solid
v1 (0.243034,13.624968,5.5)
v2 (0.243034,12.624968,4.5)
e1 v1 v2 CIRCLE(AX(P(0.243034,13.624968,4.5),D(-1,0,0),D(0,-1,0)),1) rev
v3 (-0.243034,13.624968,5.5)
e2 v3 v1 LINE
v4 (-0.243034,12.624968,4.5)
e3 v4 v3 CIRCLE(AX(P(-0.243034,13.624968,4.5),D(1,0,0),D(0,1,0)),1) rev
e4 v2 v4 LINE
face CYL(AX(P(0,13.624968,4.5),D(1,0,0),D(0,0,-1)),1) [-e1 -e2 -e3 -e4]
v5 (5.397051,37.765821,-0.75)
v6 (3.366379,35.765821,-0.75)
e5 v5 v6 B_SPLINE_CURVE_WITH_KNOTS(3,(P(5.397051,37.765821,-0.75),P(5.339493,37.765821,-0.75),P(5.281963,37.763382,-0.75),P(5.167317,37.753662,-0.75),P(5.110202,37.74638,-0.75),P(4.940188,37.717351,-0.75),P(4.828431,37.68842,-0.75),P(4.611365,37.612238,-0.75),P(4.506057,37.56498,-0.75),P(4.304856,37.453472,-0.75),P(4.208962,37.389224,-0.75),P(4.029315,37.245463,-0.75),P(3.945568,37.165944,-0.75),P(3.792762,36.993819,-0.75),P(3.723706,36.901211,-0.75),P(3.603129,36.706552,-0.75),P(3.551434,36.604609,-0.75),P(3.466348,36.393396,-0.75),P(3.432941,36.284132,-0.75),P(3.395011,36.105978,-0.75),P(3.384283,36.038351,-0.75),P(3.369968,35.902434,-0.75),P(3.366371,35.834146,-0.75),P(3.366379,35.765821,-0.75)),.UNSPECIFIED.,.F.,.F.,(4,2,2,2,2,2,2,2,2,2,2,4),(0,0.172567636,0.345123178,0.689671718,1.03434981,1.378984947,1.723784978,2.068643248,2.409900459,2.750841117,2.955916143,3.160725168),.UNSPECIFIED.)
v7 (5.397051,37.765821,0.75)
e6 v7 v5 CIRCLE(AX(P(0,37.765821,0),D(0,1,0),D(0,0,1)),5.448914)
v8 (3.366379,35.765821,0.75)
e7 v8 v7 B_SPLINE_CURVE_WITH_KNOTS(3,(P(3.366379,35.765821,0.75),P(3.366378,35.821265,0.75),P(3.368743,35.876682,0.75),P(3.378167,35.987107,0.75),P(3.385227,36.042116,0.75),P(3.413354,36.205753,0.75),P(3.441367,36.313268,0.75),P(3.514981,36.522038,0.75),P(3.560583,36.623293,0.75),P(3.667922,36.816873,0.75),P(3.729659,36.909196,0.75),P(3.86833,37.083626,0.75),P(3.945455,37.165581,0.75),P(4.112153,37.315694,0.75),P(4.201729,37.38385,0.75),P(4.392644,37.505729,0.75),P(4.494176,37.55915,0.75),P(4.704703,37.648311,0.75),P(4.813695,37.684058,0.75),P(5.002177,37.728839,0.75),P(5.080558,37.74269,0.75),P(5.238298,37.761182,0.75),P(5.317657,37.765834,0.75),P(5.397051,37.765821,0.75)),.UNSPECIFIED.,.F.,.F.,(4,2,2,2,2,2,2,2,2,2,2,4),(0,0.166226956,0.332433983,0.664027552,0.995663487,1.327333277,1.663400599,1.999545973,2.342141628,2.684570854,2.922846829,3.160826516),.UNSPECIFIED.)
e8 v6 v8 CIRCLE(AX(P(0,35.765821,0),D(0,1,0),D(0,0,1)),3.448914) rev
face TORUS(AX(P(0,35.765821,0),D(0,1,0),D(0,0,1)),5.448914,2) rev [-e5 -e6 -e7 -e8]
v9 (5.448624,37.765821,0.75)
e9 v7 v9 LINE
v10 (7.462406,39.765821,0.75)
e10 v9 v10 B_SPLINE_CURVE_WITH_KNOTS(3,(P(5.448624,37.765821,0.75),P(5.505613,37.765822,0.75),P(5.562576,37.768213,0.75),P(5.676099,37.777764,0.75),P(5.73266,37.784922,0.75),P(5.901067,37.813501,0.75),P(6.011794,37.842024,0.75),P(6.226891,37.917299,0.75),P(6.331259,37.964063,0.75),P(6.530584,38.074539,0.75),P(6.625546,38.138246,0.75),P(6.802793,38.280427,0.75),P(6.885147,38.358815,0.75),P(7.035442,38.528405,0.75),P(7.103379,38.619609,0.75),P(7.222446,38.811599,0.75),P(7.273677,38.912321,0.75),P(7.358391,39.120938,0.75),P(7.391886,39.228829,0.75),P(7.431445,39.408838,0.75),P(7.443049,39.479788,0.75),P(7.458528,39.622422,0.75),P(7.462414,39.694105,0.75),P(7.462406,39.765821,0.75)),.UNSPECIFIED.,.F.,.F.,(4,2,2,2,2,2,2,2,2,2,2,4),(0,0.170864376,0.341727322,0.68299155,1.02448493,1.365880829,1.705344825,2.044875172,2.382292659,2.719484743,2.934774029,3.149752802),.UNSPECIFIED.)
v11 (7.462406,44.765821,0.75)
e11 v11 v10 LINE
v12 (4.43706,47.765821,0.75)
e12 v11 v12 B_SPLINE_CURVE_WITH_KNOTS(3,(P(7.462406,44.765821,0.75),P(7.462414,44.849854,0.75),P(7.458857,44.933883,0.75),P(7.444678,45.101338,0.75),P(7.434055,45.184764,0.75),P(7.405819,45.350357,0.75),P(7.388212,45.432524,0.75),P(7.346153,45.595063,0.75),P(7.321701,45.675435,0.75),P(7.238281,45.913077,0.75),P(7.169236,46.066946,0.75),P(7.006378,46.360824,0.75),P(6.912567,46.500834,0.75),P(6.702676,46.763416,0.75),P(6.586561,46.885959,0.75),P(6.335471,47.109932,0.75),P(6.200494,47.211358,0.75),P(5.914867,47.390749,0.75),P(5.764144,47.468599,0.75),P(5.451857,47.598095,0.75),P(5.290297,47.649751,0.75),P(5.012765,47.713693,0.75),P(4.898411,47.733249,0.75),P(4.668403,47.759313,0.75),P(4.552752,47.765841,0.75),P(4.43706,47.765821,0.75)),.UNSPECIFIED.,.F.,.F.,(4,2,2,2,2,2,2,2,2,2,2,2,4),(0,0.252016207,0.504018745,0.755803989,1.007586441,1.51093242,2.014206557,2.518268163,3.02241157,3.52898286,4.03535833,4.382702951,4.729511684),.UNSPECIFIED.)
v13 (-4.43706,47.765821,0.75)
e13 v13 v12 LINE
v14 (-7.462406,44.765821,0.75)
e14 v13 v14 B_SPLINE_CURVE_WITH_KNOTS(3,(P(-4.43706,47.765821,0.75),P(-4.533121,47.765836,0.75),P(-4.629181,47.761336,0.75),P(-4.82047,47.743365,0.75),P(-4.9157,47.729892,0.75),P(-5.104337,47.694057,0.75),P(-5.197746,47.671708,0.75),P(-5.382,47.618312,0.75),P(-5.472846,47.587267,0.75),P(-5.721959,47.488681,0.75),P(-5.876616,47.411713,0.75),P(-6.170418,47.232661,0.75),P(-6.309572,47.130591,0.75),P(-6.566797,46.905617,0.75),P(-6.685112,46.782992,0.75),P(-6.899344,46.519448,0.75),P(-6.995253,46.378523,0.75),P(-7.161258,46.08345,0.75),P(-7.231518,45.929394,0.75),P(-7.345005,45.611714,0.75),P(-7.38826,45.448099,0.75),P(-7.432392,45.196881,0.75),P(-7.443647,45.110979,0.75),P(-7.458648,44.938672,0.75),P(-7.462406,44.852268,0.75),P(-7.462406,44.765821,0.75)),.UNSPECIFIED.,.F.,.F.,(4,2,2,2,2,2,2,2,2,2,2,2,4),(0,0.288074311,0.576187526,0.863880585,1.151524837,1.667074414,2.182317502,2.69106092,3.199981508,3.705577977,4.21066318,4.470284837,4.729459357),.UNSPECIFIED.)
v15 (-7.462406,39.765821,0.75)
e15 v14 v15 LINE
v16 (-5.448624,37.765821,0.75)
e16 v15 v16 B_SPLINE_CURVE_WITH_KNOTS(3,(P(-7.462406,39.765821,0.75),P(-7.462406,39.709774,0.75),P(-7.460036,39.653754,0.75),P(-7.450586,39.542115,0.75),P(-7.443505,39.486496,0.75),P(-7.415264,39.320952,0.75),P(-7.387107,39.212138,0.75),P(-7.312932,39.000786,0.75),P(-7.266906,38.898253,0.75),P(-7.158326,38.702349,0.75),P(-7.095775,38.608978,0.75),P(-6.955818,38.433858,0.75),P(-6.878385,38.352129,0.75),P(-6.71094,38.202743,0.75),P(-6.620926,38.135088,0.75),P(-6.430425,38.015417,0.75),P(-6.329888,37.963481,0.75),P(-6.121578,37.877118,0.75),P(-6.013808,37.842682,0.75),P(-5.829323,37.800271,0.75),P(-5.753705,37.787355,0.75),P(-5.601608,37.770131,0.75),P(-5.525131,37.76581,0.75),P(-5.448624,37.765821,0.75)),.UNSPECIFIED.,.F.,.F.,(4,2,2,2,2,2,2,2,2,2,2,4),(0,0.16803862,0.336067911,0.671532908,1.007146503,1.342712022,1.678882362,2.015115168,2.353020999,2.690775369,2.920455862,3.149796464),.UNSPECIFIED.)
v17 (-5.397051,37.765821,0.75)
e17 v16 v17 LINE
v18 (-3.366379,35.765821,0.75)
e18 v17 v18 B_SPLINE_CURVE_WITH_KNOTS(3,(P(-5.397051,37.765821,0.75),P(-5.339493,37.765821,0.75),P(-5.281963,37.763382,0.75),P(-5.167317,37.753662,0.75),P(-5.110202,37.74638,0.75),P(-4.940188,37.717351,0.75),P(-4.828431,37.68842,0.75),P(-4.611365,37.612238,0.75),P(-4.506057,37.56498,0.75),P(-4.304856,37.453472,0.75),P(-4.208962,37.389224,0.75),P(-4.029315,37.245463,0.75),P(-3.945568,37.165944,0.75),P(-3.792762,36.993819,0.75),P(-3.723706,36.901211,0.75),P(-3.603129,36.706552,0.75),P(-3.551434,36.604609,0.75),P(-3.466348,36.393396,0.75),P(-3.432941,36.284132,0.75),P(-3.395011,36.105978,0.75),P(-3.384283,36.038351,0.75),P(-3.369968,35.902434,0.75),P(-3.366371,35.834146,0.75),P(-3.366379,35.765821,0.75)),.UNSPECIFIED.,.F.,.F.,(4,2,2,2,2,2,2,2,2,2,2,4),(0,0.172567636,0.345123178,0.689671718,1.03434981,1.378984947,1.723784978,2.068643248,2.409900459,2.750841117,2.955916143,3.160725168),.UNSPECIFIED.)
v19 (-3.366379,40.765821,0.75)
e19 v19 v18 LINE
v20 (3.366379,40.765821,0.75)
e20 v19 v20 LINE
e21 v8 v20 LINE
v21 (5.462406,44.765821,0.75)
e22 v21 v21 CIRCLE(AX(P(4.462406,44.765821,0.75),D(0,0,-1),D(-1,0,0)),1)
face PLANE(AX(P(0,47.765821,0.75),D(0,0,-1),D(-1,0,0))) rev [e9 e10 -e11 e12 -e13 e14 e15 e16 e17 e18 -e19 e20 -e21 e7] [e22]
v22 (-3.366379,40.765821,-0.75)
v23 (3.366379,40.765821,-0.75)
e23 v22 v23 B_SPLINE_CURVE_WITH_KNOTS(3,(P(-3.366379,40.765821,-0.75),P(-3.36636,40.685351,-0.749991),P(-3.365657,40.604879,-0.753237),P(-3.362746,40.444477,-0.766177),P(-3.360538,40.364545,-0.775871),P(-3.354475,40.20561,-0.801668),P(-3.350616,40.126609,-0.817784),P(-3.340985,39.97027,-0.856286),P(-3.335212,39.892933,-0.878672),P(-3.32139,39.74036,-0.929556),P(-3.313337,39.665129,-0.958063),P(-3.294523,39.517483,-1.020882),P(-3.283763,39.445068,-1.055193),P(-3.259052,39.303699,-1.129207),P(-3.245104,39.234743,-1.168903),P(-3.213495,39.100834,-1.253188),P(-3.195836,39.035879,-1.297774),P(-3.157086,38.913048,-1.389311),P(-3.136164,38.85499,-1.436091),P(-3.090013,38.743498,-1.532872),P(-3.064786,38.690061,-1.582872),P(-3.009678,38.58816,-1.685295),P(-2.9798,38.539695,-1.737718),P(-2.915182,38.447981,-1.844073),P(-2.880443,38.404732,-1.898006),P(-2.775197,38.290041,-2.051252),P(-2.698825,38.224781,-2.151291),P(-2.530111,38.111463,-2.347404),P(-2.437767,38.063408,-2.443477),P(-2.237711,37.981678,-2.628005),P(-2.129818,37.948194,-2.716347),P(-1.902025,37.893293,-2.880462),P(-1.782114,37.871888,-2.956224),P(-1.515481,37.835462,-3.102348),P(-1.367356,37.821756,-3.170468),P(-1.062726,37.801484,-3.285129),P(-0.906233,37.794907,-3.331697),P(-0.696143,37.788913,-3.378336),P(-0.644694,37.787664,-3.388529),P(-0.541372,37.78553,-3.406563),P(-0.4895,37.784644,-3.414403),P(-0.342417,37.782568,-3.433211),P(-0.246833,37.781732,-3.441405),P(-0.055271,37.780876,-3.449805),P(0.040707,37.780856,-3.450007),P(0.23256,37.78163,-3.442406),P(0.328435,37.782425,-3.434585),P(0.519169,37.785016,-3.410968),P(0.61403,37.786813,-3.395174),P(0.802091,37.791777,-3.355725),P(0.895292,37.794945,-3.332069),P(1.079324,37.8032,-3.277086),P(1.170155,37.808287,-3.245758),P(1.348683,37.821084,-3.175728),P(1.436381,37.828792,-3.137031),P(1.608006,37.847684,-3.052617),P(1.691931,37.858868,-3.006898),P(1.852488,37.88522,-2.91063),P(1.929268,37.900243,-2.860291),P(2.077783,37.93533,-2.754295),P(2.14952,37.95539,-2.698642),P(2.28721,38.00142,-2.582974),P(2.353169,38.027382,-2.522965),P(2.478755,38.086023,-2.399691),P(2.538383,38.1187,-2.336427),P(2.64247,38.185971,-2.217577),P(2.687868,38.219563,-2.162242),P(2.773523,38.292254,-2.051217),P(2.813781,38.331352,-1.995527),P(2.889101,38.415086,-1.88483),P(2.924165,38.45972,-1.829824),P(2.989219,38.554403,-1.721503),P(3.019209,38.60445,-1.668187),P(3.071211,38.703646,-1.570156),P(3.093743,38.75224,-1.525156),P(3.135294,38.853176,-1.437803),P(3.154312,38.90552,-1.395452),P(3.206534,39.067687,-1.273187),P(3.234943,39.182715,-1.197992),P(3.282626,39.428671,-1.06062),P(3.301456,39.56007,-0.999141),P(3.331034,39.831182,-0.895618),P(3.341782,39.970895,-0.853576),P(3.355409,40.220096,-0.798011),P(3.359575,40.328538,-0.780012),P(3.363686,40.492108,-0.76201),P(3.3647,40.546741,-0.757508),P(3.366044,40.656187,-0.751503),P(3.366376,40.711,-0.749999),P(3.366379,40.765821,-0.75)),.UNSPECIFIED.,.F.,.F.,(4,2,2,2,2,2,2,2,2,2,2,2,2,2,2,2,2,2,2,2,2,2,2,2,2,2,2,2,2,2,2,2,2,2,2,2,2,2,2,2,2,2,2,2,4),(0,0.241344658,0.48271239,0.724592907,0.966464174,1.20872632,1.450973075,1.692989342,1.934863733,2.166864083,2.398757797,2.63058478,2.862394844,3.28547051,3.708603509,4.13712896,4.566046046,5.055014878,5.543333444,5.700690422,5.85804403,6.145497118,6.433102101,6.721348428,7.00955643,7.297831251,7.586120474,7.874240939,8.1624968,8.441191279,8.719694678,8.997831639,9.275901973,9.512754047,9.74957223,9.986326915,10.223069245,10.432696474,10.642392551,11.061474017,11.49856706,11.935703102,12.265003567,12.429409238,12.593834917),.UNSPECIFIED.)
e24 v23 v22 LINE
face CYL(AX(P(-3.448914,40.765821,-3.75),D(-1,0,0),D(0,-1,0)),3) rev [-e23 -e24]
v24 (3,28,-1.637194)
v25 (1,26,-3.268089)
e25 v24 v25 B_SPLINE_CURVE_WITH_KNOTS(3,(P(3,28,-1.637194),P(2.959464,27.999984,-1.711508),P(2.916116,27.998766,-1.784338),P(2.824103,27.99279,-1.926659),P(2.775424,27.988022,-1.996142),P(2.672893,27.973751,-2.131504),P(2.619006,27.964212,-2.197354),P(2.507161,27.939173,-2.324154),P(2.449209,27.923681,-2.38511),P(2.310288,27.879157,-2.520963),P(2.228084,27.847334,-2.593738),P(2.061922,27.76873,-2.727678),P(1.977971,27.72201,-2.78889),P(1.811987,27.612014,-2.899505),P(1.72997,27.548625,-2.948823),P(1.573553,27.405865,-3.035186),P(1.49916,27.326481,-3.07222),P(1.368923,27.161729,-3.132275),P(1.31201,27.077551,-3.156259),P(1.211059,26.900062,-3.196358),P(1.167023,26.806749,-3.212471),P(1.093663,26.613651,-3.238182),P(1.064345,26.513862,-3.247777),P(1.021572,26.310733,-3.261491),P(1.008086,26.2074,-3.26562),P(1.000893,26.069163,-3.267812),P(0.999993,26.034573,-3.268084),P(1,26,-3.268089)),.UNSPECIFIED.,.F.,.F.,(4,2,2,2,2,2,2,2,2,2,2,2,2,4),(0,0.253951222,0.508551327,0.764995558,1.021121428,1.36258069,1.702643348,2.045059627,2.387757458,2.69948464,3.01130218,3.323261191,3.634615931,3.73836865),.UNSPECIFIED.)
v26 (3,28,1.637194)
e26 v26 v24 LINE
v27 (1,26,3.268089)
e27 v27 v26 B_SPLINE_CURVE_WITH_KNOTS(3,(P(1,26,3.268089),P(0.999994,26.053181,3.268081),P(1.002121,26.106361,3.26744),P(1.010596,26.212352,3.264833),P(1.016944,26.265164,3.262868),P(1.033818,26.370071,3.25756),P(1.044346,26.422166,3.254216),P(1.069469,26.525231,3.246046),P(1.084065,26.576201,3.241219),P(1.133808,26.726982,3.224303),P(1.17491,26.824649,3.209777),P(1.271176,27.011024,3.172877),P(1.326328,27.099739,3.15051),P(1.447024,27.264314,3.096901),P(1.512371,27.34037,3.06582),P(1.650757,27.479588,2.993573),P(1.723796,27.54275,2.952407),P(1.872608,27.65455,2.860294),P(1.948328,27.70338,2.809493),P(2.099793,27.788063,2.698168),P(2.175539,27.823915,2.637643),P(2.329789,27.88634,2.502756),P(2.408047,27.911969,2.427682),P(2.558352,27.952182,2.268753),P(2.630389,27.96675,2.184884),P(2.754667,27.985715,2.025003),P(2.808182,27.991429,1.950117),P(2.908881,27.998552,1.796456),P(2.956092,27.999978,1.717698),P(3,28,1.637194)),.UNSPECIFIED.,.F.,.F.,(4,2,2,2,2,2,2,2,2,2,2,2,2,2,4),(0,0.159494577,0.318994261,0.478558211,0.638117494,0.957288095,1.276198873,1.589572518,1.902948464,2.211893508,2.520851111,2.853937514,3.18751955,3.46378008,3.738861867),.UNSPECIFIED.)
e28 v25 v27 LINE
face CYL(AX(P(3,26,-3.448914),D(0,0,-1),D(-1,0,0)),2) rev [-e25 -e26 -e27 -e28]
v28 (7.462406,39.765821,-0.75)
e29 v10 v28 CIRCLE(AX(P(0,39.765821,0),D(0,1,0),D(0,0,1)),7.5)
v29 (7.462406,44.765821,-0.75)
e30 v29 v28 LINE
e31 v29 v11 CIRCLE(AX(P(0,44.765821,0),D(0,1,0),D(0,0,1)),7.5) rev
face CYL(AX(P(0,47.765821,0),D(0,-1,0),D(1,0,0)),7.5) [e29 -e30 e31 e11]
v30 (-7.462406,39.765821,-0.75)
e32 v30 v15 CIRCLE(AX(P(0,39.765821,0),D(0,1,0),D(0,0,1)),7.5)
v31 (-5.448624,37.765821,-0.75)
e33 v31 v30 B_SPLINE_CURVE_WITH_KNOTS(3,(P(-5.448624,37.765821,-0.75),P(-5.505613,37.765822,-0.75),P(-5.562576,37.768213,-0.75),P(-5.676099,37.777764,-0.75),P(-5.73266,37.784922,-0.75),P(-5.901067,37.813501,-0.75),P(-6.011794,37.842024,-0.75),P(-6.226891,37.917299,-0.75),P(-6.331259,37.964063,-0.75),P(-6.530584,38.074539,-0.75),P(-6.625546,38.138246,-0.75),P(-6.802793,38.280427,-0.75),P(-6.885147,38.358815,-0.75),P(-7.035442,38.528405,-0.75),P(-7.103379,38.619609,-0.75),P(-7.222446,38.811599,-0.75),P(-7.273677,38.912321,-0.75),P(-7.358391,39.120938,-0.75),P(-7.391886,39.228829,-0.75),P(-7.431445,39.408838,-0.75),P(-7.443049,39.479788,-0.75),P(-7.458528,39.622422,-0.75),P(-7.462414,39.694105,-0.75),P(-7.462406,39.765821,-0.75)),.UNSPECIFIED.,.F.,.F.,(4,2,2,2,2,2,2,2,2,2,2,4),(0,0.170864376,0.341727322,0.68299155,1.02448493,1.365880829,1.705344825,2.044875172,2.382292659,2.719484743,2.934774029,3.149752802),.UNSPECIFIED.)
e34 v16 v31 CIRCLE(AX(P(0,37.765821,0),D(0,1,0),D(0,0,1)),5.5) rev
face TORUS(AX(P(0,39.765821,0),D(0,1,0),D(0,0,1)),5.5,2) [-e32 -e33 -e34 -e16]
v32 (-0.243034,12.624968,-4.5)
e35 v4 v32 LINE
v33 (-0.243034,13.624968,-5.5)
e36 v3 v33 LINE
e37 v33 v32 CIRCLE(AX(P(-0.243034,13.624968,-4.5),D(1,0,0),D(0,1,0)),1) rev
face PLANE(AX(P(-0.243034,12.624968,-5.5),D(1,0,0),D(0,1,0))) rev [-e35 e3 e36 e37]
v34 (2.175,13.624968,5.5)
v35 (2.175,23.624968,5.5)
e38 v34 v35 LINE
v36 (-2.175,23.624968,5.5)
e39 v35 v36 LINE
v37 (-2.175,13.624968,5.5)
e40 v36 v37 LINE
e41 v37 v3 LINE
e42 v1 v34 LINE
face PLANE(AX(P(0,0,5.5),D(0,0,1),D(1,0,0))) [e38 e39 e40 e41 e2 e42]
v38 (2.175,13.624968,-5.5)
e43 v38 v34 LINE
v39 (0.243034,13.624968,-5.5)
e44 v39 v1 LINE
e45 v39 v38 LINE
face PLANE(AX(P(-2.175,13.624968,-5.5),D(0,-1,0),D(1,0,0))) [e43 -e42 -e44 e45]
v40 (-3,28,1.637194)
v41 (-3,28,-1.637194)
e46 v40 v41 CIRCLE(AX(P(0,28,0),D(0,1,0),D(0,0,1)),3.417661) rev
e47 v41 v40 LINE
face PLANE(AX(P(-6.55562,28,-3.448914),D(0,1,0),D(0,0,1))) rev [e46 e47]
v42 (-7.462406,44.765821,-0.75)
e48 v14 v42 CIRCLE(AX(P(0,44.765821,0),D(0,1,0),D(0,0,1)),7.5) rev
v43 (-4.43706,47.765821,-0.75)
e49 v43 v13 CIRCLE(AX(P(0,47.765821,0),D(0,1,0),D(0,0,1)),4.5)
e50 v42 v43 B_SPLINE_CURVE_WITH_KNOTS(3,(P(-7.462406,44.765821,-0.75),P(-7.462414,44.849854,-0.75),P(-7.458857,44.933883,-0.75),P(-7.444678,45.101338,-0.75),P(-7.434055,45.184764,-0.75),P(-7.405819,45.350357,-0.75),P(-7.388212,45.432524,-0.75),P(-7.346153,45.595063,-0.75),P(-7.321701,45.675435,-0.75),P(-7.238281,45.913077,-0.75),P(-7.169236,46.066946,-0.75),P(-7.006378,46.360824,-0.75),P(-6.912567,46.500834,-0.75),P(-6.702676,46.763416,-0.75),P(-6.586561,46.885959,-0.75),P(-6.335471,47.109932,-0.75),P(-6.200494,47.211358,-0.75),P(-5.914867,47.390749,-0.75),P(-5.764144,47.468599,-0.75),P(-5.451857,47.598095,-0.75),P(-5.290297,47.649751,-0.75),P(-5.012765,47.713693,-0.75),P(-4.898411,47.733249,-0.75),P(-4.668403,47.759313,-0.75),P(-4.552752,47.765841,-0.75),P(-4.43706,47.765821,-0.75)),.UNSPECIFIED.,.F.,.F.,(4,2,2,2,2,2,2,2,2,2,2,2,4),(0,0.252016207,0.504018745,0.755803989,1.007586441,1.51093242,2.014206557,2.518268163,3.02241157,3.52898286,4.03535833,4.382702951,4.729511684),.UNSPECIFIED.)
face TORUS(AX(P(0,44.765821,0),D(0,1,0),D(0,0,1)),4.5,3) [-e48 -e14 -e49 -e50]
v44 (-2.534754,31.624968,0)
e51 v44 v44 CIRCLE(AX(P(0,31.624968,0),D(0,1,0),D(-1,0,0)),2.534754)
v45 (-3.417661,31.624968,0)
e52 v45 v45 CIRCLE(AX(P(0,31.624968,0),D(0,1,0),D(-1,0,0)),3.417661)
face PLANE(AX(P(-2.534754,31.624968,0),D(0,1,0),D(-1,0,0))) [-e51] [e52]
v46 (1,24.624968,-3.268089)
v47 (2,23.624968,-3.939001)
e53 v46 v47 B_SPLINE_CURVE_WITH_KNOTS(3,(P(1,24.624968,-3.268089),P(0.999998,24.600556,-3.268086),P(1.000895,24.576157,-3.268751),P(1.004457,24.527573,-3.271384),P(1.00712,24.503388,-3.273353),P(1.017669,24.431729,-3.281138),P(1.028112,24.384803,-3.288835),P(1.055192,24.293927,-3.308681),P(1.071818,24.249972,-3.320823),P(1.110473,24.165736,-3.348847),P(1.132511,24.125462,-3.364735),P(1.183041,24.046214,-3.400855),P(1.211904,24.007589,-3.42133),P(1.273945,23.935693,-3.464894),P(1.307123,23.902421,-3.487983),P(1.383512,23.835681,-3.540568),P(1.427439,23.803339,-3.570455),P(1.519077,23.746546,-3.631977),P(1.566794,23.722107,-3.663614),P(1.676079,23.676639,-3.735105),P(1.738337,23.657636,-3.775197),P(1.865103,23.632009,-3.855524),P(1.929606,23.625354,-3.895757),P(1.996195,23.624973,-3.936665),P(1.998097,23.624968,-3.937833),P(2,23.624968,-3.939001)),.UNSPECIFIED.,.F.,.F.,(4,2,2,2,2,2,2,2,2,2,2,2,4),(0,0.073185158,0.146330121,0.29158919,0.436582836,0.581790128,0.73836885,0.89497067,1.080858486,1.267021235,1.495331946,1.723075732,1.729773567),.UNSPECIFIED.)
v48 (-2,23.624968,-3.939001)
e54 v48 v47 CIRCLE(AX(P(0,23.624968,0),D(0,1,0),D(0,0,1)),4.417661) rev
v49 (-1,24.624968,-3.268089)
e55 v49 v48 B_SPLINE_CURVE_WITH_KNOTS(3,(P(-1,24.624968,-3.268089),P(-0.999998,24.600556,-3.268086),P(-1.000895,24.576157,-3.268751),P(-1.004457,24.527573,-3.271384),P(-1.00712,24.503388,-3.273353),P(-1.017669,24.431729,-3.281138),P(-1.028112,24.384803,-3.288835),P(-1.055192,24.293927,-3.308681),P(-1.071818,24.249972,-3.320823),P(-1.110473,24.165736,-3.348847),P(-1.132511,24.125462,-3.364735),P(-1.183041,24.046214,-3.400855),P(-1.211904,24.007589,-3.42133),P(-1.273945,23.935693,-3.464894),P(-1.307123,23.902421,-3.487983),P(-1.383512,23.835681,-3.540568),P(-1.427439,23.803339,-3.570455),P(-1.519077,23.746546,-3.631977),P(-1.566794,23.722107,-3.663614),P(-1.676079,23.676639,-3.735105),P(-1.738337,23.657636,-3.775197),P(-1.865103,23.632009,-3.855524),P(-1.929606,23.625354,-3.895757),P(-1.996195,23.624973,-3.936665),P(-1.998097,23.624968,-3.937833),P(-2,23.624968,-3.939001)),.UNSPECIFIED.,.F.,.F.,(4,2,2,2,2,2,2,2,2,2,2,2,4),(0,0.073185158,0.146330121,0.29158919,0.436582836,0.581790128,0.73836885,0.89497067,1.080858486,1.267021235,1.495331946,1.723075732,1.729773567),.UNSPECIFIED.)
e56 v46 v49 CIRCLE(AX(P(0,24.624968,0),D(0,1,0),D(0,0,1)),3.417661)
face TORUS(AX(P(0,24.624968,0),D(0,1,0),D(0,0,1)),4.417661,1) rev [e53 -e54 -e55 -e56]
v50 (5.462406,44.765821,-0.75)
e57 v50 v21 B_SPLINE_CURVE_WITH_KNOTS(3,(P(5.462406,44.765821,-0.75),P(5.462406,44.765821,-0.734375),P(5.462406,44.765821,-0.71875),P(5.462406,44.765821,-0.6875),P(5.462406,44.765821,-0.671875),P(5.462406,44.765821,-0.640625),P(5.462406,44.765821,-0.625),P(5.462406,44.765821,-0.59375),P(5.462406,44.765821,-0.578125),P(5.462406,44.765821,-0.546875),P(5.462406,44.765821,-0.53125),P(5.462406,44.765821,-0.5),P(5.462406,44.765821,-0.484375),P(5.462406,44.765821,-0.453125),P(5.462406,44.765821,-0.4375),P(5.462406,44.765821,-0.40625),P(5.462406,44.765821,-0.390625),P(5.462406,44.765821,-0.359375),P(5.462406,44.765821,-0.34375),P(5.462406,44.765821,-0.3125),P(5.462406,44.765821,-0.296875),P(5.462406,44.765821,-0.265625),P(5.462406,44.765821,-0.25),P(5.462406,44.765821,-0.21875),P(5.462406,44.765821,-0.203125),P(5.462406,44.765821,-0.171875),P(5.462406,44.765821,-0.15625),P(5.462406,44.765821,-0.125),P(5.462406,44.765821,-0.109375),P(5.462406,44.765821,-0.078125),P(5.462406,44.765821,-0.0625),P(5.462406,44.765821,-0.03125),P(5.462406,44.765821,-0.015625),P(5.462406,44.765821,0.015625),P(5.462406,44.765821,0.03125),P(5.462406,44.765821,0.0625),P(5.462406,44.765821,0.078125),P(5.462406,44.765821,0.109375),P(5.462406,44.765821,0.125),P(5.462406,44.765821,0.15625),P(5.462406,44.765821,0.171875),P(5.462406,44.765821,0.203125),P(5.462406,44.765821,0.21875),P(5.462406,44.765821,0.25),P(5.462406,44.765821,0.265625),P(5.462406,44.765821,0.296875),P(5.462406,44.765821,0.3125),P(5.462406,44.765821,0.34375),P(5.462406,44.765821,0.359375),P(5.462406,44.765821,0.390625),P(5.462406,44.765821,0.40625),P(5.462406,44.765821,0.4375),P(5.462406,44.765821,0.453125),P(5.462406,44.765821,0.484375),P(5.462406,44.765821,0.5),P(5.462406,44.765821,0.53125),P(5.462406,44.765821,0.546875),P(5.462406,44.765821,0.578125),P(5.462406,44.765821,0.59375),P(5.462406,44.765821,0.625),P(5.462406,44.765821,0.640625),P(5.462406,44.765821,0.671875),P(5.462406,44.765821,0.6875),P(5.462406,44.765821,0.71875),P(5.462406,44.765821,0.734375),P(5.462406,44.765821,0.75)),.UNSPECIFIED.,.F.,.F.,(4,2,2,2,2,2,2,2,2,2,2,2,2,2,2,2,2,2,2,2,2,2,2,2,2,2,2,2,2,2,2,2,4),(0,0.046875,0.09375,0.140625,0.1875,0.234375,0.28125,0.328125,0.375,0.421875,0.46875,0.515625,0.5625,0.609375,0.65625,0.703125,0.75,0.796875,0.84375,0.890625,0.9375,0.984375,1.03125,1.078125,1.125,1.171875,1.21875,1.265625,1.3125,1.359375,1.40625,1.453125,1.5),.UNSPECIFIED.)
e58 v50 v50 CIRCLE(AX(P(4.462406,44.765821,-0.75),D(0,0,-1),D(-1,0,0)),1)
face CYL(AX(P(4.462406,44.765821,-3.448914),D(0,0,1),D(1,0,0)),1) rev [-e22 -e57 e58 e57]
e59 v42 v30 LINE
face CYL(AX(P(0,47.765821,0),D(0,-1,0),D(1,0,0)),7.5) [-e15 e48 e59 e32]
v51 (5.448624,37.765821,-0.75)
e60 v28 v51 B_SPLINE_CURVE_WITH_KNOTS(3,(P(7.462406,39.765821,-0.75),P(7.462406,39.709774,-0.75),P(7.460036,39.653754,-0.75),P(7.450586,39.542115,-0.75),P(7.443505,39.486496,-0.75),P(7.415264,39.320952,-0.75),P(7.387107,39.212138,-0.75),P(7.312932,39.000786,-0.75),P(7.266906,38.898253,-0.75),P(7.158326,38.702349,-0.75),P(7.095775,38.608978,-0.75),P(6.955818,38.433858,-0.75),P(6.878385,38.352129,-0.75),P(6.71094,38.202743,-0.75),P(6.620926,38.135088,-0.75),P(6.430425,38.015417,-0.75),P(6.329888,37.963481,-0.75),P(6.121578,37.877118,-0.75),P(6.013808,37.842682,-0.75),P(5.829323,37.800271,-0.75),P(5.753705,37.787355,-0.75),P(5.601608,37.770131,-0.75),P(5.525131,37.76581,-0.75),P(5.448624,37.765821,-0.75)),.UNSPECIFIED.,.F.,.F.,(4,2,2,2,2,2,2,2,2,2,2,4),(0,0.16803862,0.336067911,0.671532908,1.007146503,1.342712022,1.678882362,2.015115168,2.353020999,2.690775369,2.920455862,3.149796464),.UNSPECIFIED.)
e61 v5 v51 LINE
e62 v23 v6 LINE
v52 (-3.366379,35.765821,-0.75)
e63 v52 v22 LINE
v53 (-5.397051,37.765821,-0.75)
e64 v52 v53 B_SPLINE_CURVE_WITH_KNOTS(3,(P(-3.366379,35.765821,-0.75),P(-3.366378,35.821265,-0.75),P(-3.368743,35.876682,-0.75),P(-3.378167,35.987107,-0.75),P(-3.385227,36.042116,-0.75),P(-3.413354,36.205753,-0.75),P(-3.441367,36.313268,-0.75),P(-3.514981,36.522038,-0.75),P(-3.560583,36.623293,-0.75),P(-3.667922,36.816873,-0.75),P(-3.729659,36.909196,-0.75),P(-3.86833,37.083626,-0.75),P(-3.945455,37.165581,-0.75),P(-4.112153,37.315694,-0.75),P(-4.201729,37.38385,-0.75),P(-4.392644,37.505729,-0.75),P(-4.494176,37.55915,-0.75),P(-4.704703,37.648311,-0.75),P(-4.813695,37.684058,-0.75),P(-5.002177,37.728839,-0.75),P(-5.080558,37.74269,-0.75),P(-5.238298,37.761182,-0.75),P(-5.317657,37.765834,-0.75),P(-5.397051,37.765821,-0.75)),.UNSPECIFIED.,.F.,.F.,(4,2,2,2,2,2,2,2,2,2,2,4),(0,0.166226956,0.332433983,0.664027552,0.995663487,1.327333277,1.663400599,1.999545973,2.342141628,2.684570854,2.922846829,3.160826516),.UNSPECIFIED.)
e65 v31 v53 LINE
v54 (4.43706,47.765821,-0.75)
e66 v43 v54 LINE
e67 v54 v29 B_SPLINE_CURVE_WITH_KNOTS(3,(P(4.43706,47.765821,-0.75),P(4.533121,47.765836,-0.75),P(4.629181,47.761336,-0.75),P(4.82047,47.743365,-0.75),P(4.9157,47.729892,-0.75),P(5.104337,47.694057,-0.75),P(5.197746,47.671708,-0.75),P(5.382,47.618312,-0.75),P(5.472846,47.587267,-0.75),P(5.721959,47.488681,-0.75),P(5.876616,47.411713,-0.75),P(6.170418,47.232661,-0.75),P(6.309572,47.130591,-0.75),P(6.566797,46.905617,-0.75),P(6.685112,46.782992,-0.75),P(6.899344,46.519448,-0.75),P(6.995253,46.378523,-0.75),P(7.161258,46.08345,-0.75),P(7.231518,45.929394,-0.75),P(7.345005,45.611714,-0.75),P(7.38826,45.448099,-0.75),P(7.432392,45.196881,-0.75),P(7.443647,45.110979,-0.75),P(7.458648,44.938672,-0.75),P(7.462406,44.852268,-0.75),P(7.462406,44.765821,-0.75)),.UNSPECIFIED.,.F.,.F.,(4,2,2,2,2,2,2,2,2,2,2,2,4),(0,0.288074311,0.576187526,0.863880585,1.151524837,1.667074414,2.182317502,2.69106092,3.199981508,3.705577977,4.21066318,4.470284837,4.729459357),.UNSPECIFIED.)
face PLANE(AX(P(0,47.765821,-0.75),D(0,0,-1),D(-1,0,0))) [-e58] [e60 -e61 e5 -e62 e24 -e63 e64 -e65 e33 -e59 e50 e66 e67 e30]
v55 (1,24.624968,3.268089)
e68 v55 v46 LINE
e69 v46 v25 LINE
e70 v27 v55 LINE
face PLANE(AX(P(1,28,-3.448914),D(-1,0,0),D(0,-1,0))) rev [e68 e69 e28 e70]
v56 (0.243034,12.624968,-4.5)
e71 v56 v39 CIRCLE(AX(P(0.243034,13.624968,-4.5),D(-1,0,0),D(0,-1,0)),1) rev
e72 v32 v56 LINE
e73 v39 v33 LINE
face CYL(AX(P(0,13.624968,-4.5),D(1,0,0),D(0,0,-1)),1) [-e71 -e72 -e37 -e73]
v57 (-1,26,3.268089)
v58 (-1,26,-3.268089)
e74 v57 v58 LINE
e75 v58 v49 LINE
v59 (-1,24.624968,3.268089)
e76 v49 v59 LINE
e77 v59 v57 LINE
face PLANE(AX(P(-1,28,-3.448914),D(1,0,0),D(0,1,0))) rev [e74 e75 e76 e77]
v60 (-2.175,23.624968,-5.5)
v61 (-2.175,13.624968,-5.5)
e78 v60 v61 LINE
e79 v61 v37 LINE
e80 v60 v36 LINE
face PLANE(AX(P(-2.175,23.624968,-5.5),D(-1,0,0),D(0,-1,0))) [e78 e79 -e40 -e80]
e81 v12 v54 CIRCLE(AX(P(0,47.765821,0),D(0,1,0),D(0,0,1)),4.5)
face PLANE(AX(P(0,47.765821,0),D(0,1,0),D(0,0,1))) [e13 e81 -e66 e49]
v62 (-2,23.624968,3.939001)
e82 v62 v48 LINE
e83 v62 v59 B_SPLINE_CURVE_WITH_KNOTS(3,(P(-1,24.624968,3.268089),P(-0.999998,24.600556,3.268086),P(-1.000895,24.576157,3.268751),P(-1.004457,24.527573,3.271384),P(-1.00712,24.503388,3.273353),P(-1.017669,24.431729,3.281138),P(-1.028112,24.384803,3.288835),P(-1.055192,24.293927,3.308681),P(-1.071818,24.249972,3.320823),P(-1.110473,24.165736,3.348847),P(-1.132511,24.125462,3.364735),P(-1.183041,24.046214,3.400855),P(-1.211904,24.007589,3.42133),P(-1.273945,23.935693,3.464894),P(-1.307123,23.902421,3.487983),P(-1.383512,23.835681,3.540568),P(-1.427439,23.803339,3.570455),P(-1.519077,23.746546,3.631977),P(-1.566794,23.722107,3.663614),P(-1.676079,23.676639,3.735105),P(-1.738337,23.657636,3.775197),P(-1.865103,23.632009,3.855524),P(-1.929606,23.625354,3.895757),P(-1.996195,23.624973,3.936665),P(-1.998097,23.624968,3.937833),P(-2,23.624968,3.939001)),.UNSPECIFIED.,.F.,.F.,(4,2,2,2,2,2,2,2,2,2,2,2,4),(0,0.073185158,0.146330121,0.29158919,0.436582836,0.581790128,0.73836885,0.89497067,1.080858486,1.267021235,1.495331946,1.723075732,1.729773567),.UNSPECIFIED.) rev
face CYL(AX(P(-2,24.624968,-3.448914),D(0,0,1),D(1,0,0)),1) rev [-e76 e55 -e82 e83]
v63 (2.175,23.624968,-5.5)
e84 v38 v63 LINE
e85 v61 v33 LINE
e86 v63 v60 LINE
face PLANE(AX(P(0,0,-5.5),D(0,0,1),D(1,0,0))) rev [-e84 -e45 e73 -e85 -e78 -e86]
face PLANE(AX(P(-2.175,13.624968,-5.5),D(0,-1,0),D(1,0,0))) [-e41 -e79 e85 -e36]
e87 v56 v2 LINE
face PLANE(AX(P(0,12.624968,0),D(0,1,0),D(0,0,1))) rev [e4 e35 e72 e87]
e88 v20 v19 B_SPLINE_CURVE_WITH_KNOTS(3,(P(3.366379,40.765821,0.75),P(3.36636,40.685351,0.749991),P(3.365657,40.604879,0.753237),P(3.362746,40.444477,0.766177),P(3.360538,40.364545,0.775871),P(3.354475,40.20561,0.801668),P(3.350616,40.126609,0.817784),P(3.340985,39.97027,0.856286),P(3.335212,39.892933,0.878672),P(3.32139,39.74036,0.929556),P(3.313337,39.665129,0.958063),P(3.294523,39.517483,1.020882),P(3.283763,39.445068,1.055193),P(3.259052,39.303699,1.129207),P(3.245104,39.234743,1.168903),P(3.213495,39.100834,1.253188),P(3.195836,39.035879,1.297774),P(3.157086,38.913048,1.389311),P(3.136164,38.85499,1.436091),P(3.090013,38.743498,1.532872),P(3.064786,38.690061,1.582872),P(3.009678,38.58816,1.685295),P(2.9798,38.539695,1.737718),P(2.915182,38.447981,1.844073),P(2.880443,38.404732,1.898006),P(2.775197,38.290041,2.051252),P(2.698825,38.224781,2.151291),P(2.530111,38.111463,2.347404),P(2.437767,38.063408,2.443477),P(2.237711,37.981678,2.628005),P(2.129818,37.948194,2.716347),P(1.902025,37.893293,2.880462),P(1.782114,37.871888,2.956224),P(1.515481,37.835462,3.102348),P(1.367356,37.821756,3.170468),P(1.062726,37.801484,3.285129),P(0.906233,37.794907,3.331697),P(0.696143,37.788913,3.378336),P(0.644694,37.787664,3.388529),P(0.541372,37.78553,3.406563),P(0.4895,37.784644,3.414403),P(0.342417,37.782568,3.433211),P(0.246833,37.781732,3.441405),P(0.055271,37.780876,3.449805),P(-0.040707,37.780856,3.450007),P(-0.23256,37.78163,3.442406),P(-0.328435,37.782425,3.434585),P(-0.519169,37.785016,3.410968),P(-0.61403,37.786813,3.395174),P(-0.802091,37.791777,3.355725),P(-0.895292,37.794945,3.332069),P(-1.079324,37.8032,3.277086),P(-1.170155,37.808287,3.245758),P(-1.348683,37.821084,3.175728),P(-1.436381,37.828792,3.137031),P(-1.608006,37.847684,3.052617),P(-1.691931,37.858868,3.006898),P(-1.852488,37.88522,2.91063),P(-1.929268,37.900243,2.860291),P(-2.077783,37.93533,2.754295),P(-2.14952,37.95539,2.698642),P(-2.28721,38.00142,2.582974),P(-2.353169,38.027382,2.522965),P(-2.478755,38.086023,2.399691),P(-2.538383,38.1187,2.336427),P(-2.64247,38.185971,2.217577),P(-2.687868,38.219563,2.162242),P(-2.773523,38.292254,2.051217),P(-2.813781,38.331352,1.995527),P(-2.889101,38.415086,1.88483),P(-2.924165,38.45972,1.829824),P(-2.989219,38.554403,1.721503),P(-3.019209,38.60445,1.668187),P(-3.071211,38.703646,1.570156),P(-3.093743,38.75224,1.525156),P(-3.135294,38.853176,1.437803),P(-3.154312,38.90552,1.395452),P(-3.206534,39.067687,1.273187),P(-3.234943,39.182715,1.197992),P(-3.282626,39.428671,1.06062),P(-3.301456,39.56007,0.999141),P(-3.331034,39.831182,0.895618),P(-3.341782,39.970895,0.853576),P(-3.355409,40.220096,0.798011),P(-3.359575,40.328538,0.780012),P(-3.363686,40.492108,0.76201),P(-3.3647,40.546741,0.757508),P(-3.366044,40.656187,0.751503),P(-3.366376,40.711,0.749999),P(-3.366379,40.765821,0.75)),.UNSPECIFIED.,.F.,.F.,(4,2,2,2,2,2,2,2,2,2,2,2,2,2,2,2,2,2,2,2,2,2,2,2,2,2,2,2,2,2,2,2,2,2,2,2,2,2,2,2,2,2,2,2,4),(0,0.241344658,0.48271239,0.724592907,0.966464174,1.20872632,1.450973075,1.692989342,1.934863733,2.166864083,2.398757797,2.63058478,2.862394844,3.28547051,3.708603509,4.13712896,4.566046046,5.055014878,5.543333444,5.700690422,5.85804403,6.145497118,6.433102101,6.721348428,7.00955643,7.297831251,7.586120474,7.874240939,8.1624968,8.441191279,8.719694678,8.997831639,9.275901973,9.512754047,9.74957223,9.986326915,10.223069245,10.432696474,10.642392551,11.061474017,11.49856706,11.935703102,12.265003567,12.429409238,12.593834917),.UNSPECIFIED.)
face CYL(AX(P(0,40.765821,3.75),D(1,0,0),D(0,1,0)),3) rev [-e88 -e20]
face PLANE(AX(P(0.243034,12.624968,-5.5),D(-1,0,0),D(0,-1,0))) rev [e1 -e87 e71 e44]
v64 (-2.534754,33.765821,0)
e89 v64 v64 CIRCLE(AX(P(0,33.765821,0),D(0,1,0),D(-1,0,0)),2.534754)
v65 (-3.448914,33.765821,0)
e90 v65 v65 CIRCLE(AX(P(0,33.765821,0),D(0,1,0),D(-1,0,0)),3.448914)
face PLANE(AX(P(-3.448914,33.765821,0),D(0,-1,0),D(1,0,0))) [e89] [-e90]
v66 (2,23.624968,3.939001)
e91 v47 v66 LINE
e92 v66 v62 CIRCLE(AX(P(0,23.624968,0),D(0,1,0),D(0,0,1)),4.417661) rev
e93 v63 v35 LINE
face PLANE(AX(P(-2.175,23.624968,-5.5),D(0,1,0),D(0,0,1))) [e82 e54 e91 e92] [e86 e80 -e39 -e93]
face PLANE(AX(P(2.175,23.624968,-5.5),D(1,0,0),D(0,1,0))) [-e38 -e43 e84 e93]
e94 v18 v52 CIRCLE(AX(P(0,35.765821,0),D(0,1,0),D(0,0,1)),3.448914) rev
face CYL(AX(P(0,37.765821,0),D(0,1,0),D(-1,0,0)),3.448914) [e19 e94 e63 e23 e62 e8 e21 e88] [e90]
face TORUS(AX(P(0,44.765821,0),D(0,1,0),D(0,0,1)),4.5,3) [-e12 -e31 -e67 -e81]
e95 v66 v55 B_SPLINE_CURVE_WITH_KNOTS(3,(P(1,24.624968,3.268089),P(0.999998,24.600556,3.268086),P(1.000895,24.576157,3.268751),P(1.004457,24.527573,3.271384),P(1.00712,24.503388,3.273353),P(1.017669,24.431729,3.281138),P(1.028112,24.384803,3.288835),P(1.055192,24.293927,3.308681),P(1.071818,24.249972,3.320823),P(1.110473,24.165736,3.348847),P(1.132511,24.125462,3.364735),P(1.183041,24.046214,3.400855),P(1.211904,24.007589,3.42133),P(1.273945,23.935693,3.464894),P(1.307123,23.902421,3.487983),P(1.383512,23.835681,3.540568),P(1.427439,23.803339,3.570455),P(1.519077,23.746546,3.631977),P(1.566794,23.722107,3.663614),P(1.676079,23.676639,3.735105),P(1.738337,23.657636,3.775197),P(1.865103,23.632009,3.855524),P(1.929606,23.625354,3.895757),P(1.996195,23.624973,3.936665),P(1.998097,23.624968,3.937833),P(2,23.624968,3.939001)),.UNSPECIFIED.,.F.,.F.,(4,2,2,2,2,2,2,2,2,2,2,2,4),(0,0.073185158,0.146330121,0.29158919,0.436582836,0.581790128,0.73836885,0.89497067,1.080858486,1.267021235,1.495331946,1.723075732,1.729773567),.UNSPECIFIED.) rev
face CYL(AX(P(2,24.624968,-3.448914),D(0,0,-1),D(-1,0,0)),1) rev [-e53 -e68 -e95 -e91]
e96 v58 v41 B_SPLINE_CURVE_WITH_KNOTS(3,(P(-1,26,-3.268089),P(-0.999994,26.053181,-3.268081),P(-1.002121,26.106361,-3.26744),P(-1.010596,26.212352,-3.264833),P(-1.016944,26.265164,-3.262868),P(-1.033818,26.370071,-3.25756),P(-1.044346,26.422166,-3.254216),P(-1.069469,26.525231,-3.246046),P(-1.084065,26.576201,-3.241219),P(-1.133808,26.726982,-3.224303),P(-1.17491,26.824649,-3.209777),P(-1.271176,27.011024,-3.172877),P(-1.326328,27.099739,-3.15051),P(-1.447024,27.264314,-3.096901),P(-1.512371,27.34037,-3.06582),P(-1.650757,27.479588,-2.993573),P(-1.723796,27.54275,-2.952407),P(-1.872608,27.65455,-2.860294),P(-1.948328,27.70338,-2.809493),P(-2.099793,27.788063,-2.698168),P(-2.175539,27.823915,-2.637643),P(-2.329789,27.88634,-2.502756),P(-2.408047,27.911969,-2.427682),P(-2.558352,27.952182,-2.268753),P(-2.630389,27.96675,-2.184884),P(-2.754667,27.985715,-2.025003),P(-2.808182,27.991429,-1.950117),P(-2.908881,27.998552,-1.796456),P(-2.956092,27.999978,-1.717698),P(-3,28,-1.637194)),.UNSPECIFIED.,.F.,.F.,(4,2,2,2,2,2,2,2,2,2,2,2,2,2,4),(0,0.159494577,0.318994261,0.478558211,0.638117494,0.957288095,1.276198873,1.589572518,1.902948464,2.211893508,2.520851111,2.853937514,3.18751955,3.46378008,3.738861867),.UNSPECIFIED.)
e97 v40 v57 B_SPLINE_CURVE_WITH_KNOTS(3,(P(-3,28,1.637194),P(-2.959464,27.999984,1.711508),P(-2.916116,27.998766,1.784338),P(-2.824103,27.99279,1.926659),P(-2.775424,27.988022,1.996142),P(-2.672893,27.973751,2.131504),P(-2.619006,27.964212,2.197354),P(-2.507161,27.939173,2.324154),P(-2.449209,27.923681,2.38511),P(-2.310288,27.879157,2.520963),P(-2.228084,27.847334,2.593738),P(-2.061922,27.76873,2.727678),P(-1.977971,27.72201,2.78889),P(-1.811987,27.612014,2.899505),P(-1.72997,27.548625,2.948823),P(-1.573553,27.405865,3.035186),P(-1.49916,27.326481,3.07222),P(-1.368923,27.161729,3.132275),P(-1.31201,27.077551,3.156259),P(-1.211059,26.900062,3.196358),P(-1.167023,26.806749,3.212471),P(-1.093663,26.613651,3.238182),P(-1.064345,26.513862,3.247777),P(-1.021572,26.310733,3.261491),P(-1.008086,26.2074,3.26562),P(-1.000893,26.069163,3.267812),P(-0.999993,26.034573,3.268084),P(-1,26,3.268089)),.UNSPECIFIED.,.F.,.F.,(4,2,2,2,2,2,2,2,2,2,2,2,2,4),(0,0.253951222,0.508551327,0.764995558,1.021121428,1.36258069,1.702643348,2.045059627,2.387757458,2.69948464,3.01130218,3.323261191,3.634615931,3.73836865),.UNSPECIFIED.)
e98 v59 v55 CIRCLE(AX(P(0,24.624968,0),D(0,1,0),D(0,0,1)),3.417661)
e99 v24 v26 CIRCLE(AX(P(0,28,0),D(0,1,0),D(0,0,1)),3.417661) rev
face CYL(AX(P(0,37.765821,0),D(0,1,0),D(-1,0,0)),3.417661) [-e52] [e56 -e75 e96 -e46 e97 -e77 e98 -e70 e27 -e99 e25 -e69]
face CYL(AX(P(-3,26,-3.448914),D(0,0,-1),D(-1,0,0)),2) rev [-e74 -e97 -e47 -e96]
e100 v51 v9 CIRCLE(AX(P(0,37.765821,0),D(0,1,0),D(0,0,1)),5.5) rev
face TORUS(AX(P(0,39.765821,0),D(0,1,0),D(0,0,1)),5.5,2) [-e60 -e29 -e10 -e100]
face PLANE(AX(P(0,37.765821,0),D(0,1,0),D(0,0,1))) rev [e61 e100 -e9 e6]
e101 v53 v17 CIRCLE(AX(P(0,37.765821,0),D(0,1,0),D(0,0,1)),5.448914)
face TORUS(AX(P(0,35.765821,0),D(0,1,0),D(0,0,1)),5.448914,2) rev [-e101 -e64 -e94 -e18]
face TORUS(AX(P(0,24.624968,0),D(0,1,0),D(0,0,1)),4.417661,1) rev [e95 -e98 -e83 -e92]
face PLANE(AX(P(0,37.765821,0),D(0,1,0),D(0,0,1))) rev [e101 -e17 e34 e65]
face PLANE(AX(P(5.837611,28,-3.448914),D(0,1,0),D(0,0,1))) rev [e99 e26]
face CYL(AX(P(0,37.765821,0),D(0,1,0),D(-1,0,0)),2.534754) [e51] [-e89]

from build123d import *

# Parameters (mm, degrees)
BOSS_EXTRUDE1_DEPTH      = 10
FILLET2_R                = 2
FILLET3_R                = 3
CUT_EXTRUDE1_DEPTH       = 49.473897211
CUT_EXTRUDE1_DEPTH_BACK  = 49.473897211
SKETCH3_R                = 1
CUT_EXTRUDE2_DEPTH       = 49.473897211
CUT_EXTRUDE2_DEPTH_BACK  = 49.473897211
SKETCH4_W                = 5.555619824
SKETCH4_H                = 11.886700215
SKETCH4_W_2              = 4.837610552
SKETCH4_H_2              = 13.886700215
FILLET4_R                = 2
BOSS_EXTRUDE2_DEPTH      = 5.5
BOSS_EXTRUDE2_DEPTH_BACK = 5.5
SKETCH7_W                = 4.35
SKETCH7_H                = 10
FILLET5_R                = 1
SKETCH8_W                = 0.486068648
SKETCH8_H                = 11
BOSS_EXTRUDE3_DEPTH      = 1
FILLET6_R                = 1


with BuildPart() as part:
    # Sketch1 → Revolve1 (revolve)
    with BuildSketch(Plane.XY):
        Polygon((-3.448914015, 37.765821371), (-3.448914015, 33.765821371), (-2.534753992, 33.765821371), (-2.534753992, 31.624967984), (-3.41766068, 31.624967984), (-3.41766068, 23), (0, 23), (0, 37.765821371), align=None)
    revolve(axis=Axis((0, 37.765821371, 0), (0, -1, 0)))

    # Sketch2 → Boss-Extrude1 (add)
    with BuildSketch(Plane(origin=(0, 37.765821371, 0), x_dir=(1, 0, 0), z_dir=(0, 1, 0))):
        with BuildLine():
            Line((3.366379046, 0.75), (-3.366379046, 0.75))
            ThreePointArc((-3.366379046, 0.75), (-3.448914015, 0), (-3.366379046, -0.75))
            Line((-3.366379046, -0.75), (3.366379046, -0.75))
            ThreePointArc((3.366379046, -0.75), (3.428218178, -0.37726384), (3.448914015, 0))
            ThreePointArc((3.448914015, 0), (3.428218178, 0.37726384), (3.366379046, 0.75))
        make_face()
        with BuildLine():
            Line((-3.366379046, 0.75), (-7.462405778, 0.75))
            ThreePointArc((-7.462405778, 0.75), (-7.5, 0), (-7.462405778, -0.75))
            Line((-7.462405778, -0.75), (-3.366379046, -0.75))
            ThreePointArc((-3.366379046, -0.75), (-3.448914015, 0), (-3.366379046, 0.75))
        make_face()
        with BuildLine():
            ThreePointArc((7.5, 0), (7.490595548, 0.375470813), (7.462405778, 0.75))
            Line((7.462405778, 0.75), (3.366379046, 0.75))
            ThreePointArc((3.366379046, 0.75), (3.428218178, 0.37726384), (3.448914015, 0))
            ThreePointArc((3.448914015, 0), (3.428218178, -0.37726384), (3.366379046, -0.75))
            Line((3.366379046, -0.75), (7.462405778, -0.75))
            ThreePointArc((7.462405778, -0.75), (7.490595548, -0.375470813), (7.5, 0))
        make_face()
    extrude(amount=BOSS_EXTRUDE1_DEPTH)

    # Fillet2
    # the kernel refuses this fillet: 2 mm, written as the material it adds along each edge
    with BuildSketch(Plane(origin=(0, 37.765821371, 0), x_dir=(-0.09803421101524086, 0, -0.9951830452085783), z_dir=(-0.9951830452085783, 0, 0.09803421101524086))) as fillet2_piece_1_section:
        with BuildLine():
            CenterArc((3.448914015 + FILLET2_R, FILLET2_R), FILLET2_R, 180, 90)
            Line((3.448914015 + FILLET2_R, 0), (3.448914015, 0))
            Line((3.448914015, 0), (3.448914015, FILLET2_R))
        make_face()
    fillet2_piece_1 = revolve(axis=Axis((0, 37.765821371, 0), (0, -1, 0)), revolution_arc=191.251965623, mode=Mode.PRIVATE)
    fillet2_piece_1 = split(fillet2_piece_1, bisect_by=Plane(origin=(3.870689991, 37.318827735, -0.75), z_dir=(0, 0, 1)), keep=Keep.TOP, mode=Mode.PRIVATE)
    fillet2_piece_1 = split(fillet2_piece_1, bisect_by=Plane(origin=(3.870689991, 37.318827735, 0.75), z_dir=(0, 0, -1)), keep=Keep.TOP, mode=Mode.PRIVATE)
    add(fillet2_piece_1)
    with BuildSketch(Plane(origin=(0, 37.765821371, 0), x_dir=(0.09800035789508027, 0, 0.9951863794548418), z_dir=(0.9951863794548418, 0, -0.09800035789508027))) as fillet2_piece_2_section:
        with BuildLine():
            CenterArc((3.448914015 + FILLET2_R, FILLET2_R), FILLET2_R, 180, 90)
            Line((3.448914015 + FILLET2_R, 0), (3.448914015, 0))
            Line((3.448914015, 0), (3.448914015, FILLET2_R))
        make_face()
    fillet2_piece_2 = revolve(axis=Axis((0, 37.765821371, 0), (0, -1, 0)), revolution_arc=95.624033786, mode=Mode.PRIVATE)
    fillet2_piece_2 = split(fillet2_piece_2, bisect_by=Plane(origin=(-3.870690025, 37.318827894, 0.75), z_dir=(0, 0, -1)), keep=Keep.TOP, mode=Mode.PRIVATE)
    add(fillet2_piece_2)
    with BuildSketch(Plane(origin=(0, 37.765821371, 0), x_dir=(-1, 0, 0), z_dir=(0, 0, 1))) as fillet2_piece_3_section:
        with BuildLine():
            CenterArc((3.448914015 + FILLET2_R, FILLET2_R), FILLET2_R, 180, 90)
            Line((3.448914015 + FILLET2_R, 0), (3.448914015, 0))
            Line((3.448914015, 0), (3.448914015, FILLET2_R))
        make_face()
    fillet2_piece_3 = revolve(axis=Axis((0, 37.765821371, 0), (0, -1, 0)), revolution_arc=95.624033786, mode=Mode.PRIVATE)
    fillet2_piece_3 = split(fillet2_piece_3, bisect_by=Plane(origin=(-3.870689874, 37.318828004, -0.75), z_dir=(0, 0, 1)), keep=Keep.TOP, mode=Mode.PRIVATE)
    add(fillet2_piece_3)
    # the kernel refuses this fillet: 2 mm, written as the material it takes off along each edge
    with BuildSketch(Plane(origin=(0, 37.765821371, 0), x_dir=(-0.7201079494948177, 0, -0.6938620475817721), z_dir=(0.6938620475817721, 0, -0.7201079494948177))) as fillet2_2_piece_1:
        with BuildLine():
            CenterArc((7.5 - FILLET2_R, FILLET2_R), FILLET2_R, 270, 90)
            Line((7.5, FILLET2_R), (7.5, 0))
            Line((7.5, 0), (7.5 - FILLET2_R, 0))
        make_face()
    revolve(axis=Axis((0, 37.765821371, 0), (0, 1, 0)), revolution_arc=87.873212667, mode=Mode.SUBTRACT)
    with BuildSketch(Plane(origin=(0, 37.765821371, 0), x_dir=(0.7201079494948216, 0, 0.6938620475817678), z_dir=(-0.6938620475817678, 0, 0.7201079494948216))) as fillet2_2_piece_2:
        with BuildLine():
            CenterArc((7.5 - FILLET2_R, FILLET2_R), FILLET2_R, 270, 90)
            Line((7.5 - FILLET2_R, 0), (7.5, 0))
            Line((7.5, 0), (7.5, FILLET2_R))
        make_face()
    revolve(axis=Axis((0, 37.765821371, 0), (0, 1, 0)), revolution_arc=87.873212667, mode=Mode.SUBTRACT)

    # Fillet3
    # the kernel refuses this fillet: 3 mm, written as the material it adds along each edge
    with BuildSketch(Plane(origin=(10.866379046, 37.765821371, -0.75), x_dir=(0, 1, 0), z_dir=(-1, 0, 0))) as fillet3_piece_1_section:
        with BuildLine():
            CenterArc((FILLET3_R, FILLET3_R), FILLET3_R, 180, 90)
            Line((0, FILLET3_R), (0, 0))
            Line((0, 0), (FILLET3_R, 0))
        make_face()
    fillet3_piece_1 = extrude(amount=21.732758092, mode=Mode.PRIVATE)
    fillet3_piece_1 = fillet3_piece_1 & Plane(origin=(0, 38.470226203, 0), x_dir=(-1, 0, 0), z_dir=(0, -1, 0)) * Cylinder(3.448914015, 56, mode=Mode.PRIVATE)
    add(fillet3_piece_1)
    with BuildSketch(Plane(origin=(10.866379046, 37.765821371, 0.75), x_dir=(0, 1, 0), z_dir=(-1, 0, 0))) as fillet3_piece_2_section:
        with BuildLine():
            CenterArc((FILLET3_R, -FILLET3_R), FILLET3_R, 90, 90)
            Line((0, -FILLET3_R), (0, 0))
            Line((0, 0), (FILLET3_R, 0))
        make_face()
    fillet3_piece_2 = extrude(amount=21.732758092, mode=Mode.PRIVATE)
    fillet3_piece_2 = fillet3_piece_2 & Plane(origin=(0, 38.470226203, 0), x_dir=(-1, 0, 0), z_dir=(0, -1, 0)) * Cylinder(3.448914015, 56, mode=Mode.PRIVATE)
    add(fillet3_piece_2)
    # the kernel refuses this fillet: 3 mm, written as the material it takes off along each edge
    with BuildSketch(Plane(origin=(0, 47.765821371, 0), x_dir=(-0.4534410859899706, 0, -0.8912862511764871), z_dir=(0.8912862511764871, 0, -0.4534410859899706))) as fillet3_2_piece_1:
        with BuildLine():
            CenterArc((7.5 - FILLET3_R, -FILLET3_R), FILLET3_R, 0, 90)
            Line((7.5 - FILLET3_R, 0), (7.5, 0))
            Line((7.5, 0), (7.5, -FILLET3_R))
        make_face()
    revolve(axis=Axis((0, 47.765821371, 0), (0, 1, 0)), revolution_arc=126.070648523, mode=Mode.SUBTRACT)
    with BuildSketch(Plane(origin=(0, 47.765821371, 0), x_dir=(0.4534410859901425, 0, -0.8912862511763997), z_dir=(-0.8912862511763997, 0, -0.4534410859901425))) as fillet3_2_piece_2:
        with BuildLine():
            CenterArc((7.5 - FILLET3_R, FILLET3_R), FILLET3_R, 270, 90)
            Line((7.5, FILLET3_R), (7.5, 0))
            Line((7.5, 0), (7.5 - FILLET3_R, 0))
        make_face()
    revolve(axis=Axis((0, 47.765821371, 0), (0, -1, 0)), revolution_arc=126.070648523, mode=Mode.SUBTRACT)

    # Sketch3 → Cut-Extrude1 (cut, two sides: drawn at the far end of the back side and taken through both)
    with BuildSketch(Plane.XY.offset(-CUT_EXTRUDE1_DEPTH_BACK)):
        with Locations((4.462405778, 44.765821371)):
            Circle(SKETCH3_R)
    extrude(amount=CUT_EXTRUDE1_DEPTH + CUT_EXTRUDE1_DEPTH_BACK, mode=Mode.SUBTRACT)

    # Sketch4 → Cut-Extrude2 (cut, two sides: drawn at the far end of the back side and taken through both)
    with BuildSketch(Plane.XY.offset(-CUT_EXTRUDE2_DEPTH_BACK)):
        with Locations((-3.777809912, 22.056649893)):
            Rectangle(SKETCH4_W, SKETCH4_H)
        with Locations((3.418805276, 21.056649893)):
            Rectangle(SKETCH4_W_2, SKETCH4_H_2)
    extrude(amount=CUT_EXTRUDE2_DEPTH + CUT_EXTRUDE2_DEPTH_BACK, mode=Mode.SUBTRACT)

    # Fillet4
    fillet4_edges = [part.edges().sort_by_distance(p)[0] for p in [
        (-1, 28, 0),
        (1, 28, 0),
    ]]
    fillet(fillet4_edges, radius=FILLET4_R)

    # Sketch7 → Boss-Extrude2 (add, two sides: drawn at the far end of the back side and taken through both)
    with BuildSketch(Plane.XY.offset(-BOSS_EXTRUDE2_DEPTH_BACK)):
        with Locations((0, 18.624967984)):
            Rectangle(SKETCH7_W, SKETCH7_H)
    extrude(amount=BOSS_EXTRUDE2_DEPTH + BOSS_EXTRUDE2_DEPTH_BACK)

    # Fillet5
    fillet5_edges = [part.edges().sort_by_distance(p)[0] for p in [
        (1, 23.624967984, 0),
        (0, 23.624967984, -3.41766068),
        (0, 23.624967984, 3.41766068),
        (-1, 23.624967984, 0),
    ]]
    fillet(fillet5_edges, radius=FILLET5_R)

    # Sketch8 → Boss-Extrude3 (add)
    with BuildSketch(Plane.XZ.offset(-13.624967984)):
        Rectangle(SKETCH8_W, SKETCH8_H)
    extrude(amount=BOSS_EXTRUDE3_DEPTH)

    # Fillet6
    fillet6_edges = [part.edges().sort_by_distance(p)[0] for p in [
        (0, 12.624967984, -5.5),
        (0, 12.624967984, 5.5),
    ]]
    fillet(fillet6_edges, radius=FILLET6_R)


solid = part.part
